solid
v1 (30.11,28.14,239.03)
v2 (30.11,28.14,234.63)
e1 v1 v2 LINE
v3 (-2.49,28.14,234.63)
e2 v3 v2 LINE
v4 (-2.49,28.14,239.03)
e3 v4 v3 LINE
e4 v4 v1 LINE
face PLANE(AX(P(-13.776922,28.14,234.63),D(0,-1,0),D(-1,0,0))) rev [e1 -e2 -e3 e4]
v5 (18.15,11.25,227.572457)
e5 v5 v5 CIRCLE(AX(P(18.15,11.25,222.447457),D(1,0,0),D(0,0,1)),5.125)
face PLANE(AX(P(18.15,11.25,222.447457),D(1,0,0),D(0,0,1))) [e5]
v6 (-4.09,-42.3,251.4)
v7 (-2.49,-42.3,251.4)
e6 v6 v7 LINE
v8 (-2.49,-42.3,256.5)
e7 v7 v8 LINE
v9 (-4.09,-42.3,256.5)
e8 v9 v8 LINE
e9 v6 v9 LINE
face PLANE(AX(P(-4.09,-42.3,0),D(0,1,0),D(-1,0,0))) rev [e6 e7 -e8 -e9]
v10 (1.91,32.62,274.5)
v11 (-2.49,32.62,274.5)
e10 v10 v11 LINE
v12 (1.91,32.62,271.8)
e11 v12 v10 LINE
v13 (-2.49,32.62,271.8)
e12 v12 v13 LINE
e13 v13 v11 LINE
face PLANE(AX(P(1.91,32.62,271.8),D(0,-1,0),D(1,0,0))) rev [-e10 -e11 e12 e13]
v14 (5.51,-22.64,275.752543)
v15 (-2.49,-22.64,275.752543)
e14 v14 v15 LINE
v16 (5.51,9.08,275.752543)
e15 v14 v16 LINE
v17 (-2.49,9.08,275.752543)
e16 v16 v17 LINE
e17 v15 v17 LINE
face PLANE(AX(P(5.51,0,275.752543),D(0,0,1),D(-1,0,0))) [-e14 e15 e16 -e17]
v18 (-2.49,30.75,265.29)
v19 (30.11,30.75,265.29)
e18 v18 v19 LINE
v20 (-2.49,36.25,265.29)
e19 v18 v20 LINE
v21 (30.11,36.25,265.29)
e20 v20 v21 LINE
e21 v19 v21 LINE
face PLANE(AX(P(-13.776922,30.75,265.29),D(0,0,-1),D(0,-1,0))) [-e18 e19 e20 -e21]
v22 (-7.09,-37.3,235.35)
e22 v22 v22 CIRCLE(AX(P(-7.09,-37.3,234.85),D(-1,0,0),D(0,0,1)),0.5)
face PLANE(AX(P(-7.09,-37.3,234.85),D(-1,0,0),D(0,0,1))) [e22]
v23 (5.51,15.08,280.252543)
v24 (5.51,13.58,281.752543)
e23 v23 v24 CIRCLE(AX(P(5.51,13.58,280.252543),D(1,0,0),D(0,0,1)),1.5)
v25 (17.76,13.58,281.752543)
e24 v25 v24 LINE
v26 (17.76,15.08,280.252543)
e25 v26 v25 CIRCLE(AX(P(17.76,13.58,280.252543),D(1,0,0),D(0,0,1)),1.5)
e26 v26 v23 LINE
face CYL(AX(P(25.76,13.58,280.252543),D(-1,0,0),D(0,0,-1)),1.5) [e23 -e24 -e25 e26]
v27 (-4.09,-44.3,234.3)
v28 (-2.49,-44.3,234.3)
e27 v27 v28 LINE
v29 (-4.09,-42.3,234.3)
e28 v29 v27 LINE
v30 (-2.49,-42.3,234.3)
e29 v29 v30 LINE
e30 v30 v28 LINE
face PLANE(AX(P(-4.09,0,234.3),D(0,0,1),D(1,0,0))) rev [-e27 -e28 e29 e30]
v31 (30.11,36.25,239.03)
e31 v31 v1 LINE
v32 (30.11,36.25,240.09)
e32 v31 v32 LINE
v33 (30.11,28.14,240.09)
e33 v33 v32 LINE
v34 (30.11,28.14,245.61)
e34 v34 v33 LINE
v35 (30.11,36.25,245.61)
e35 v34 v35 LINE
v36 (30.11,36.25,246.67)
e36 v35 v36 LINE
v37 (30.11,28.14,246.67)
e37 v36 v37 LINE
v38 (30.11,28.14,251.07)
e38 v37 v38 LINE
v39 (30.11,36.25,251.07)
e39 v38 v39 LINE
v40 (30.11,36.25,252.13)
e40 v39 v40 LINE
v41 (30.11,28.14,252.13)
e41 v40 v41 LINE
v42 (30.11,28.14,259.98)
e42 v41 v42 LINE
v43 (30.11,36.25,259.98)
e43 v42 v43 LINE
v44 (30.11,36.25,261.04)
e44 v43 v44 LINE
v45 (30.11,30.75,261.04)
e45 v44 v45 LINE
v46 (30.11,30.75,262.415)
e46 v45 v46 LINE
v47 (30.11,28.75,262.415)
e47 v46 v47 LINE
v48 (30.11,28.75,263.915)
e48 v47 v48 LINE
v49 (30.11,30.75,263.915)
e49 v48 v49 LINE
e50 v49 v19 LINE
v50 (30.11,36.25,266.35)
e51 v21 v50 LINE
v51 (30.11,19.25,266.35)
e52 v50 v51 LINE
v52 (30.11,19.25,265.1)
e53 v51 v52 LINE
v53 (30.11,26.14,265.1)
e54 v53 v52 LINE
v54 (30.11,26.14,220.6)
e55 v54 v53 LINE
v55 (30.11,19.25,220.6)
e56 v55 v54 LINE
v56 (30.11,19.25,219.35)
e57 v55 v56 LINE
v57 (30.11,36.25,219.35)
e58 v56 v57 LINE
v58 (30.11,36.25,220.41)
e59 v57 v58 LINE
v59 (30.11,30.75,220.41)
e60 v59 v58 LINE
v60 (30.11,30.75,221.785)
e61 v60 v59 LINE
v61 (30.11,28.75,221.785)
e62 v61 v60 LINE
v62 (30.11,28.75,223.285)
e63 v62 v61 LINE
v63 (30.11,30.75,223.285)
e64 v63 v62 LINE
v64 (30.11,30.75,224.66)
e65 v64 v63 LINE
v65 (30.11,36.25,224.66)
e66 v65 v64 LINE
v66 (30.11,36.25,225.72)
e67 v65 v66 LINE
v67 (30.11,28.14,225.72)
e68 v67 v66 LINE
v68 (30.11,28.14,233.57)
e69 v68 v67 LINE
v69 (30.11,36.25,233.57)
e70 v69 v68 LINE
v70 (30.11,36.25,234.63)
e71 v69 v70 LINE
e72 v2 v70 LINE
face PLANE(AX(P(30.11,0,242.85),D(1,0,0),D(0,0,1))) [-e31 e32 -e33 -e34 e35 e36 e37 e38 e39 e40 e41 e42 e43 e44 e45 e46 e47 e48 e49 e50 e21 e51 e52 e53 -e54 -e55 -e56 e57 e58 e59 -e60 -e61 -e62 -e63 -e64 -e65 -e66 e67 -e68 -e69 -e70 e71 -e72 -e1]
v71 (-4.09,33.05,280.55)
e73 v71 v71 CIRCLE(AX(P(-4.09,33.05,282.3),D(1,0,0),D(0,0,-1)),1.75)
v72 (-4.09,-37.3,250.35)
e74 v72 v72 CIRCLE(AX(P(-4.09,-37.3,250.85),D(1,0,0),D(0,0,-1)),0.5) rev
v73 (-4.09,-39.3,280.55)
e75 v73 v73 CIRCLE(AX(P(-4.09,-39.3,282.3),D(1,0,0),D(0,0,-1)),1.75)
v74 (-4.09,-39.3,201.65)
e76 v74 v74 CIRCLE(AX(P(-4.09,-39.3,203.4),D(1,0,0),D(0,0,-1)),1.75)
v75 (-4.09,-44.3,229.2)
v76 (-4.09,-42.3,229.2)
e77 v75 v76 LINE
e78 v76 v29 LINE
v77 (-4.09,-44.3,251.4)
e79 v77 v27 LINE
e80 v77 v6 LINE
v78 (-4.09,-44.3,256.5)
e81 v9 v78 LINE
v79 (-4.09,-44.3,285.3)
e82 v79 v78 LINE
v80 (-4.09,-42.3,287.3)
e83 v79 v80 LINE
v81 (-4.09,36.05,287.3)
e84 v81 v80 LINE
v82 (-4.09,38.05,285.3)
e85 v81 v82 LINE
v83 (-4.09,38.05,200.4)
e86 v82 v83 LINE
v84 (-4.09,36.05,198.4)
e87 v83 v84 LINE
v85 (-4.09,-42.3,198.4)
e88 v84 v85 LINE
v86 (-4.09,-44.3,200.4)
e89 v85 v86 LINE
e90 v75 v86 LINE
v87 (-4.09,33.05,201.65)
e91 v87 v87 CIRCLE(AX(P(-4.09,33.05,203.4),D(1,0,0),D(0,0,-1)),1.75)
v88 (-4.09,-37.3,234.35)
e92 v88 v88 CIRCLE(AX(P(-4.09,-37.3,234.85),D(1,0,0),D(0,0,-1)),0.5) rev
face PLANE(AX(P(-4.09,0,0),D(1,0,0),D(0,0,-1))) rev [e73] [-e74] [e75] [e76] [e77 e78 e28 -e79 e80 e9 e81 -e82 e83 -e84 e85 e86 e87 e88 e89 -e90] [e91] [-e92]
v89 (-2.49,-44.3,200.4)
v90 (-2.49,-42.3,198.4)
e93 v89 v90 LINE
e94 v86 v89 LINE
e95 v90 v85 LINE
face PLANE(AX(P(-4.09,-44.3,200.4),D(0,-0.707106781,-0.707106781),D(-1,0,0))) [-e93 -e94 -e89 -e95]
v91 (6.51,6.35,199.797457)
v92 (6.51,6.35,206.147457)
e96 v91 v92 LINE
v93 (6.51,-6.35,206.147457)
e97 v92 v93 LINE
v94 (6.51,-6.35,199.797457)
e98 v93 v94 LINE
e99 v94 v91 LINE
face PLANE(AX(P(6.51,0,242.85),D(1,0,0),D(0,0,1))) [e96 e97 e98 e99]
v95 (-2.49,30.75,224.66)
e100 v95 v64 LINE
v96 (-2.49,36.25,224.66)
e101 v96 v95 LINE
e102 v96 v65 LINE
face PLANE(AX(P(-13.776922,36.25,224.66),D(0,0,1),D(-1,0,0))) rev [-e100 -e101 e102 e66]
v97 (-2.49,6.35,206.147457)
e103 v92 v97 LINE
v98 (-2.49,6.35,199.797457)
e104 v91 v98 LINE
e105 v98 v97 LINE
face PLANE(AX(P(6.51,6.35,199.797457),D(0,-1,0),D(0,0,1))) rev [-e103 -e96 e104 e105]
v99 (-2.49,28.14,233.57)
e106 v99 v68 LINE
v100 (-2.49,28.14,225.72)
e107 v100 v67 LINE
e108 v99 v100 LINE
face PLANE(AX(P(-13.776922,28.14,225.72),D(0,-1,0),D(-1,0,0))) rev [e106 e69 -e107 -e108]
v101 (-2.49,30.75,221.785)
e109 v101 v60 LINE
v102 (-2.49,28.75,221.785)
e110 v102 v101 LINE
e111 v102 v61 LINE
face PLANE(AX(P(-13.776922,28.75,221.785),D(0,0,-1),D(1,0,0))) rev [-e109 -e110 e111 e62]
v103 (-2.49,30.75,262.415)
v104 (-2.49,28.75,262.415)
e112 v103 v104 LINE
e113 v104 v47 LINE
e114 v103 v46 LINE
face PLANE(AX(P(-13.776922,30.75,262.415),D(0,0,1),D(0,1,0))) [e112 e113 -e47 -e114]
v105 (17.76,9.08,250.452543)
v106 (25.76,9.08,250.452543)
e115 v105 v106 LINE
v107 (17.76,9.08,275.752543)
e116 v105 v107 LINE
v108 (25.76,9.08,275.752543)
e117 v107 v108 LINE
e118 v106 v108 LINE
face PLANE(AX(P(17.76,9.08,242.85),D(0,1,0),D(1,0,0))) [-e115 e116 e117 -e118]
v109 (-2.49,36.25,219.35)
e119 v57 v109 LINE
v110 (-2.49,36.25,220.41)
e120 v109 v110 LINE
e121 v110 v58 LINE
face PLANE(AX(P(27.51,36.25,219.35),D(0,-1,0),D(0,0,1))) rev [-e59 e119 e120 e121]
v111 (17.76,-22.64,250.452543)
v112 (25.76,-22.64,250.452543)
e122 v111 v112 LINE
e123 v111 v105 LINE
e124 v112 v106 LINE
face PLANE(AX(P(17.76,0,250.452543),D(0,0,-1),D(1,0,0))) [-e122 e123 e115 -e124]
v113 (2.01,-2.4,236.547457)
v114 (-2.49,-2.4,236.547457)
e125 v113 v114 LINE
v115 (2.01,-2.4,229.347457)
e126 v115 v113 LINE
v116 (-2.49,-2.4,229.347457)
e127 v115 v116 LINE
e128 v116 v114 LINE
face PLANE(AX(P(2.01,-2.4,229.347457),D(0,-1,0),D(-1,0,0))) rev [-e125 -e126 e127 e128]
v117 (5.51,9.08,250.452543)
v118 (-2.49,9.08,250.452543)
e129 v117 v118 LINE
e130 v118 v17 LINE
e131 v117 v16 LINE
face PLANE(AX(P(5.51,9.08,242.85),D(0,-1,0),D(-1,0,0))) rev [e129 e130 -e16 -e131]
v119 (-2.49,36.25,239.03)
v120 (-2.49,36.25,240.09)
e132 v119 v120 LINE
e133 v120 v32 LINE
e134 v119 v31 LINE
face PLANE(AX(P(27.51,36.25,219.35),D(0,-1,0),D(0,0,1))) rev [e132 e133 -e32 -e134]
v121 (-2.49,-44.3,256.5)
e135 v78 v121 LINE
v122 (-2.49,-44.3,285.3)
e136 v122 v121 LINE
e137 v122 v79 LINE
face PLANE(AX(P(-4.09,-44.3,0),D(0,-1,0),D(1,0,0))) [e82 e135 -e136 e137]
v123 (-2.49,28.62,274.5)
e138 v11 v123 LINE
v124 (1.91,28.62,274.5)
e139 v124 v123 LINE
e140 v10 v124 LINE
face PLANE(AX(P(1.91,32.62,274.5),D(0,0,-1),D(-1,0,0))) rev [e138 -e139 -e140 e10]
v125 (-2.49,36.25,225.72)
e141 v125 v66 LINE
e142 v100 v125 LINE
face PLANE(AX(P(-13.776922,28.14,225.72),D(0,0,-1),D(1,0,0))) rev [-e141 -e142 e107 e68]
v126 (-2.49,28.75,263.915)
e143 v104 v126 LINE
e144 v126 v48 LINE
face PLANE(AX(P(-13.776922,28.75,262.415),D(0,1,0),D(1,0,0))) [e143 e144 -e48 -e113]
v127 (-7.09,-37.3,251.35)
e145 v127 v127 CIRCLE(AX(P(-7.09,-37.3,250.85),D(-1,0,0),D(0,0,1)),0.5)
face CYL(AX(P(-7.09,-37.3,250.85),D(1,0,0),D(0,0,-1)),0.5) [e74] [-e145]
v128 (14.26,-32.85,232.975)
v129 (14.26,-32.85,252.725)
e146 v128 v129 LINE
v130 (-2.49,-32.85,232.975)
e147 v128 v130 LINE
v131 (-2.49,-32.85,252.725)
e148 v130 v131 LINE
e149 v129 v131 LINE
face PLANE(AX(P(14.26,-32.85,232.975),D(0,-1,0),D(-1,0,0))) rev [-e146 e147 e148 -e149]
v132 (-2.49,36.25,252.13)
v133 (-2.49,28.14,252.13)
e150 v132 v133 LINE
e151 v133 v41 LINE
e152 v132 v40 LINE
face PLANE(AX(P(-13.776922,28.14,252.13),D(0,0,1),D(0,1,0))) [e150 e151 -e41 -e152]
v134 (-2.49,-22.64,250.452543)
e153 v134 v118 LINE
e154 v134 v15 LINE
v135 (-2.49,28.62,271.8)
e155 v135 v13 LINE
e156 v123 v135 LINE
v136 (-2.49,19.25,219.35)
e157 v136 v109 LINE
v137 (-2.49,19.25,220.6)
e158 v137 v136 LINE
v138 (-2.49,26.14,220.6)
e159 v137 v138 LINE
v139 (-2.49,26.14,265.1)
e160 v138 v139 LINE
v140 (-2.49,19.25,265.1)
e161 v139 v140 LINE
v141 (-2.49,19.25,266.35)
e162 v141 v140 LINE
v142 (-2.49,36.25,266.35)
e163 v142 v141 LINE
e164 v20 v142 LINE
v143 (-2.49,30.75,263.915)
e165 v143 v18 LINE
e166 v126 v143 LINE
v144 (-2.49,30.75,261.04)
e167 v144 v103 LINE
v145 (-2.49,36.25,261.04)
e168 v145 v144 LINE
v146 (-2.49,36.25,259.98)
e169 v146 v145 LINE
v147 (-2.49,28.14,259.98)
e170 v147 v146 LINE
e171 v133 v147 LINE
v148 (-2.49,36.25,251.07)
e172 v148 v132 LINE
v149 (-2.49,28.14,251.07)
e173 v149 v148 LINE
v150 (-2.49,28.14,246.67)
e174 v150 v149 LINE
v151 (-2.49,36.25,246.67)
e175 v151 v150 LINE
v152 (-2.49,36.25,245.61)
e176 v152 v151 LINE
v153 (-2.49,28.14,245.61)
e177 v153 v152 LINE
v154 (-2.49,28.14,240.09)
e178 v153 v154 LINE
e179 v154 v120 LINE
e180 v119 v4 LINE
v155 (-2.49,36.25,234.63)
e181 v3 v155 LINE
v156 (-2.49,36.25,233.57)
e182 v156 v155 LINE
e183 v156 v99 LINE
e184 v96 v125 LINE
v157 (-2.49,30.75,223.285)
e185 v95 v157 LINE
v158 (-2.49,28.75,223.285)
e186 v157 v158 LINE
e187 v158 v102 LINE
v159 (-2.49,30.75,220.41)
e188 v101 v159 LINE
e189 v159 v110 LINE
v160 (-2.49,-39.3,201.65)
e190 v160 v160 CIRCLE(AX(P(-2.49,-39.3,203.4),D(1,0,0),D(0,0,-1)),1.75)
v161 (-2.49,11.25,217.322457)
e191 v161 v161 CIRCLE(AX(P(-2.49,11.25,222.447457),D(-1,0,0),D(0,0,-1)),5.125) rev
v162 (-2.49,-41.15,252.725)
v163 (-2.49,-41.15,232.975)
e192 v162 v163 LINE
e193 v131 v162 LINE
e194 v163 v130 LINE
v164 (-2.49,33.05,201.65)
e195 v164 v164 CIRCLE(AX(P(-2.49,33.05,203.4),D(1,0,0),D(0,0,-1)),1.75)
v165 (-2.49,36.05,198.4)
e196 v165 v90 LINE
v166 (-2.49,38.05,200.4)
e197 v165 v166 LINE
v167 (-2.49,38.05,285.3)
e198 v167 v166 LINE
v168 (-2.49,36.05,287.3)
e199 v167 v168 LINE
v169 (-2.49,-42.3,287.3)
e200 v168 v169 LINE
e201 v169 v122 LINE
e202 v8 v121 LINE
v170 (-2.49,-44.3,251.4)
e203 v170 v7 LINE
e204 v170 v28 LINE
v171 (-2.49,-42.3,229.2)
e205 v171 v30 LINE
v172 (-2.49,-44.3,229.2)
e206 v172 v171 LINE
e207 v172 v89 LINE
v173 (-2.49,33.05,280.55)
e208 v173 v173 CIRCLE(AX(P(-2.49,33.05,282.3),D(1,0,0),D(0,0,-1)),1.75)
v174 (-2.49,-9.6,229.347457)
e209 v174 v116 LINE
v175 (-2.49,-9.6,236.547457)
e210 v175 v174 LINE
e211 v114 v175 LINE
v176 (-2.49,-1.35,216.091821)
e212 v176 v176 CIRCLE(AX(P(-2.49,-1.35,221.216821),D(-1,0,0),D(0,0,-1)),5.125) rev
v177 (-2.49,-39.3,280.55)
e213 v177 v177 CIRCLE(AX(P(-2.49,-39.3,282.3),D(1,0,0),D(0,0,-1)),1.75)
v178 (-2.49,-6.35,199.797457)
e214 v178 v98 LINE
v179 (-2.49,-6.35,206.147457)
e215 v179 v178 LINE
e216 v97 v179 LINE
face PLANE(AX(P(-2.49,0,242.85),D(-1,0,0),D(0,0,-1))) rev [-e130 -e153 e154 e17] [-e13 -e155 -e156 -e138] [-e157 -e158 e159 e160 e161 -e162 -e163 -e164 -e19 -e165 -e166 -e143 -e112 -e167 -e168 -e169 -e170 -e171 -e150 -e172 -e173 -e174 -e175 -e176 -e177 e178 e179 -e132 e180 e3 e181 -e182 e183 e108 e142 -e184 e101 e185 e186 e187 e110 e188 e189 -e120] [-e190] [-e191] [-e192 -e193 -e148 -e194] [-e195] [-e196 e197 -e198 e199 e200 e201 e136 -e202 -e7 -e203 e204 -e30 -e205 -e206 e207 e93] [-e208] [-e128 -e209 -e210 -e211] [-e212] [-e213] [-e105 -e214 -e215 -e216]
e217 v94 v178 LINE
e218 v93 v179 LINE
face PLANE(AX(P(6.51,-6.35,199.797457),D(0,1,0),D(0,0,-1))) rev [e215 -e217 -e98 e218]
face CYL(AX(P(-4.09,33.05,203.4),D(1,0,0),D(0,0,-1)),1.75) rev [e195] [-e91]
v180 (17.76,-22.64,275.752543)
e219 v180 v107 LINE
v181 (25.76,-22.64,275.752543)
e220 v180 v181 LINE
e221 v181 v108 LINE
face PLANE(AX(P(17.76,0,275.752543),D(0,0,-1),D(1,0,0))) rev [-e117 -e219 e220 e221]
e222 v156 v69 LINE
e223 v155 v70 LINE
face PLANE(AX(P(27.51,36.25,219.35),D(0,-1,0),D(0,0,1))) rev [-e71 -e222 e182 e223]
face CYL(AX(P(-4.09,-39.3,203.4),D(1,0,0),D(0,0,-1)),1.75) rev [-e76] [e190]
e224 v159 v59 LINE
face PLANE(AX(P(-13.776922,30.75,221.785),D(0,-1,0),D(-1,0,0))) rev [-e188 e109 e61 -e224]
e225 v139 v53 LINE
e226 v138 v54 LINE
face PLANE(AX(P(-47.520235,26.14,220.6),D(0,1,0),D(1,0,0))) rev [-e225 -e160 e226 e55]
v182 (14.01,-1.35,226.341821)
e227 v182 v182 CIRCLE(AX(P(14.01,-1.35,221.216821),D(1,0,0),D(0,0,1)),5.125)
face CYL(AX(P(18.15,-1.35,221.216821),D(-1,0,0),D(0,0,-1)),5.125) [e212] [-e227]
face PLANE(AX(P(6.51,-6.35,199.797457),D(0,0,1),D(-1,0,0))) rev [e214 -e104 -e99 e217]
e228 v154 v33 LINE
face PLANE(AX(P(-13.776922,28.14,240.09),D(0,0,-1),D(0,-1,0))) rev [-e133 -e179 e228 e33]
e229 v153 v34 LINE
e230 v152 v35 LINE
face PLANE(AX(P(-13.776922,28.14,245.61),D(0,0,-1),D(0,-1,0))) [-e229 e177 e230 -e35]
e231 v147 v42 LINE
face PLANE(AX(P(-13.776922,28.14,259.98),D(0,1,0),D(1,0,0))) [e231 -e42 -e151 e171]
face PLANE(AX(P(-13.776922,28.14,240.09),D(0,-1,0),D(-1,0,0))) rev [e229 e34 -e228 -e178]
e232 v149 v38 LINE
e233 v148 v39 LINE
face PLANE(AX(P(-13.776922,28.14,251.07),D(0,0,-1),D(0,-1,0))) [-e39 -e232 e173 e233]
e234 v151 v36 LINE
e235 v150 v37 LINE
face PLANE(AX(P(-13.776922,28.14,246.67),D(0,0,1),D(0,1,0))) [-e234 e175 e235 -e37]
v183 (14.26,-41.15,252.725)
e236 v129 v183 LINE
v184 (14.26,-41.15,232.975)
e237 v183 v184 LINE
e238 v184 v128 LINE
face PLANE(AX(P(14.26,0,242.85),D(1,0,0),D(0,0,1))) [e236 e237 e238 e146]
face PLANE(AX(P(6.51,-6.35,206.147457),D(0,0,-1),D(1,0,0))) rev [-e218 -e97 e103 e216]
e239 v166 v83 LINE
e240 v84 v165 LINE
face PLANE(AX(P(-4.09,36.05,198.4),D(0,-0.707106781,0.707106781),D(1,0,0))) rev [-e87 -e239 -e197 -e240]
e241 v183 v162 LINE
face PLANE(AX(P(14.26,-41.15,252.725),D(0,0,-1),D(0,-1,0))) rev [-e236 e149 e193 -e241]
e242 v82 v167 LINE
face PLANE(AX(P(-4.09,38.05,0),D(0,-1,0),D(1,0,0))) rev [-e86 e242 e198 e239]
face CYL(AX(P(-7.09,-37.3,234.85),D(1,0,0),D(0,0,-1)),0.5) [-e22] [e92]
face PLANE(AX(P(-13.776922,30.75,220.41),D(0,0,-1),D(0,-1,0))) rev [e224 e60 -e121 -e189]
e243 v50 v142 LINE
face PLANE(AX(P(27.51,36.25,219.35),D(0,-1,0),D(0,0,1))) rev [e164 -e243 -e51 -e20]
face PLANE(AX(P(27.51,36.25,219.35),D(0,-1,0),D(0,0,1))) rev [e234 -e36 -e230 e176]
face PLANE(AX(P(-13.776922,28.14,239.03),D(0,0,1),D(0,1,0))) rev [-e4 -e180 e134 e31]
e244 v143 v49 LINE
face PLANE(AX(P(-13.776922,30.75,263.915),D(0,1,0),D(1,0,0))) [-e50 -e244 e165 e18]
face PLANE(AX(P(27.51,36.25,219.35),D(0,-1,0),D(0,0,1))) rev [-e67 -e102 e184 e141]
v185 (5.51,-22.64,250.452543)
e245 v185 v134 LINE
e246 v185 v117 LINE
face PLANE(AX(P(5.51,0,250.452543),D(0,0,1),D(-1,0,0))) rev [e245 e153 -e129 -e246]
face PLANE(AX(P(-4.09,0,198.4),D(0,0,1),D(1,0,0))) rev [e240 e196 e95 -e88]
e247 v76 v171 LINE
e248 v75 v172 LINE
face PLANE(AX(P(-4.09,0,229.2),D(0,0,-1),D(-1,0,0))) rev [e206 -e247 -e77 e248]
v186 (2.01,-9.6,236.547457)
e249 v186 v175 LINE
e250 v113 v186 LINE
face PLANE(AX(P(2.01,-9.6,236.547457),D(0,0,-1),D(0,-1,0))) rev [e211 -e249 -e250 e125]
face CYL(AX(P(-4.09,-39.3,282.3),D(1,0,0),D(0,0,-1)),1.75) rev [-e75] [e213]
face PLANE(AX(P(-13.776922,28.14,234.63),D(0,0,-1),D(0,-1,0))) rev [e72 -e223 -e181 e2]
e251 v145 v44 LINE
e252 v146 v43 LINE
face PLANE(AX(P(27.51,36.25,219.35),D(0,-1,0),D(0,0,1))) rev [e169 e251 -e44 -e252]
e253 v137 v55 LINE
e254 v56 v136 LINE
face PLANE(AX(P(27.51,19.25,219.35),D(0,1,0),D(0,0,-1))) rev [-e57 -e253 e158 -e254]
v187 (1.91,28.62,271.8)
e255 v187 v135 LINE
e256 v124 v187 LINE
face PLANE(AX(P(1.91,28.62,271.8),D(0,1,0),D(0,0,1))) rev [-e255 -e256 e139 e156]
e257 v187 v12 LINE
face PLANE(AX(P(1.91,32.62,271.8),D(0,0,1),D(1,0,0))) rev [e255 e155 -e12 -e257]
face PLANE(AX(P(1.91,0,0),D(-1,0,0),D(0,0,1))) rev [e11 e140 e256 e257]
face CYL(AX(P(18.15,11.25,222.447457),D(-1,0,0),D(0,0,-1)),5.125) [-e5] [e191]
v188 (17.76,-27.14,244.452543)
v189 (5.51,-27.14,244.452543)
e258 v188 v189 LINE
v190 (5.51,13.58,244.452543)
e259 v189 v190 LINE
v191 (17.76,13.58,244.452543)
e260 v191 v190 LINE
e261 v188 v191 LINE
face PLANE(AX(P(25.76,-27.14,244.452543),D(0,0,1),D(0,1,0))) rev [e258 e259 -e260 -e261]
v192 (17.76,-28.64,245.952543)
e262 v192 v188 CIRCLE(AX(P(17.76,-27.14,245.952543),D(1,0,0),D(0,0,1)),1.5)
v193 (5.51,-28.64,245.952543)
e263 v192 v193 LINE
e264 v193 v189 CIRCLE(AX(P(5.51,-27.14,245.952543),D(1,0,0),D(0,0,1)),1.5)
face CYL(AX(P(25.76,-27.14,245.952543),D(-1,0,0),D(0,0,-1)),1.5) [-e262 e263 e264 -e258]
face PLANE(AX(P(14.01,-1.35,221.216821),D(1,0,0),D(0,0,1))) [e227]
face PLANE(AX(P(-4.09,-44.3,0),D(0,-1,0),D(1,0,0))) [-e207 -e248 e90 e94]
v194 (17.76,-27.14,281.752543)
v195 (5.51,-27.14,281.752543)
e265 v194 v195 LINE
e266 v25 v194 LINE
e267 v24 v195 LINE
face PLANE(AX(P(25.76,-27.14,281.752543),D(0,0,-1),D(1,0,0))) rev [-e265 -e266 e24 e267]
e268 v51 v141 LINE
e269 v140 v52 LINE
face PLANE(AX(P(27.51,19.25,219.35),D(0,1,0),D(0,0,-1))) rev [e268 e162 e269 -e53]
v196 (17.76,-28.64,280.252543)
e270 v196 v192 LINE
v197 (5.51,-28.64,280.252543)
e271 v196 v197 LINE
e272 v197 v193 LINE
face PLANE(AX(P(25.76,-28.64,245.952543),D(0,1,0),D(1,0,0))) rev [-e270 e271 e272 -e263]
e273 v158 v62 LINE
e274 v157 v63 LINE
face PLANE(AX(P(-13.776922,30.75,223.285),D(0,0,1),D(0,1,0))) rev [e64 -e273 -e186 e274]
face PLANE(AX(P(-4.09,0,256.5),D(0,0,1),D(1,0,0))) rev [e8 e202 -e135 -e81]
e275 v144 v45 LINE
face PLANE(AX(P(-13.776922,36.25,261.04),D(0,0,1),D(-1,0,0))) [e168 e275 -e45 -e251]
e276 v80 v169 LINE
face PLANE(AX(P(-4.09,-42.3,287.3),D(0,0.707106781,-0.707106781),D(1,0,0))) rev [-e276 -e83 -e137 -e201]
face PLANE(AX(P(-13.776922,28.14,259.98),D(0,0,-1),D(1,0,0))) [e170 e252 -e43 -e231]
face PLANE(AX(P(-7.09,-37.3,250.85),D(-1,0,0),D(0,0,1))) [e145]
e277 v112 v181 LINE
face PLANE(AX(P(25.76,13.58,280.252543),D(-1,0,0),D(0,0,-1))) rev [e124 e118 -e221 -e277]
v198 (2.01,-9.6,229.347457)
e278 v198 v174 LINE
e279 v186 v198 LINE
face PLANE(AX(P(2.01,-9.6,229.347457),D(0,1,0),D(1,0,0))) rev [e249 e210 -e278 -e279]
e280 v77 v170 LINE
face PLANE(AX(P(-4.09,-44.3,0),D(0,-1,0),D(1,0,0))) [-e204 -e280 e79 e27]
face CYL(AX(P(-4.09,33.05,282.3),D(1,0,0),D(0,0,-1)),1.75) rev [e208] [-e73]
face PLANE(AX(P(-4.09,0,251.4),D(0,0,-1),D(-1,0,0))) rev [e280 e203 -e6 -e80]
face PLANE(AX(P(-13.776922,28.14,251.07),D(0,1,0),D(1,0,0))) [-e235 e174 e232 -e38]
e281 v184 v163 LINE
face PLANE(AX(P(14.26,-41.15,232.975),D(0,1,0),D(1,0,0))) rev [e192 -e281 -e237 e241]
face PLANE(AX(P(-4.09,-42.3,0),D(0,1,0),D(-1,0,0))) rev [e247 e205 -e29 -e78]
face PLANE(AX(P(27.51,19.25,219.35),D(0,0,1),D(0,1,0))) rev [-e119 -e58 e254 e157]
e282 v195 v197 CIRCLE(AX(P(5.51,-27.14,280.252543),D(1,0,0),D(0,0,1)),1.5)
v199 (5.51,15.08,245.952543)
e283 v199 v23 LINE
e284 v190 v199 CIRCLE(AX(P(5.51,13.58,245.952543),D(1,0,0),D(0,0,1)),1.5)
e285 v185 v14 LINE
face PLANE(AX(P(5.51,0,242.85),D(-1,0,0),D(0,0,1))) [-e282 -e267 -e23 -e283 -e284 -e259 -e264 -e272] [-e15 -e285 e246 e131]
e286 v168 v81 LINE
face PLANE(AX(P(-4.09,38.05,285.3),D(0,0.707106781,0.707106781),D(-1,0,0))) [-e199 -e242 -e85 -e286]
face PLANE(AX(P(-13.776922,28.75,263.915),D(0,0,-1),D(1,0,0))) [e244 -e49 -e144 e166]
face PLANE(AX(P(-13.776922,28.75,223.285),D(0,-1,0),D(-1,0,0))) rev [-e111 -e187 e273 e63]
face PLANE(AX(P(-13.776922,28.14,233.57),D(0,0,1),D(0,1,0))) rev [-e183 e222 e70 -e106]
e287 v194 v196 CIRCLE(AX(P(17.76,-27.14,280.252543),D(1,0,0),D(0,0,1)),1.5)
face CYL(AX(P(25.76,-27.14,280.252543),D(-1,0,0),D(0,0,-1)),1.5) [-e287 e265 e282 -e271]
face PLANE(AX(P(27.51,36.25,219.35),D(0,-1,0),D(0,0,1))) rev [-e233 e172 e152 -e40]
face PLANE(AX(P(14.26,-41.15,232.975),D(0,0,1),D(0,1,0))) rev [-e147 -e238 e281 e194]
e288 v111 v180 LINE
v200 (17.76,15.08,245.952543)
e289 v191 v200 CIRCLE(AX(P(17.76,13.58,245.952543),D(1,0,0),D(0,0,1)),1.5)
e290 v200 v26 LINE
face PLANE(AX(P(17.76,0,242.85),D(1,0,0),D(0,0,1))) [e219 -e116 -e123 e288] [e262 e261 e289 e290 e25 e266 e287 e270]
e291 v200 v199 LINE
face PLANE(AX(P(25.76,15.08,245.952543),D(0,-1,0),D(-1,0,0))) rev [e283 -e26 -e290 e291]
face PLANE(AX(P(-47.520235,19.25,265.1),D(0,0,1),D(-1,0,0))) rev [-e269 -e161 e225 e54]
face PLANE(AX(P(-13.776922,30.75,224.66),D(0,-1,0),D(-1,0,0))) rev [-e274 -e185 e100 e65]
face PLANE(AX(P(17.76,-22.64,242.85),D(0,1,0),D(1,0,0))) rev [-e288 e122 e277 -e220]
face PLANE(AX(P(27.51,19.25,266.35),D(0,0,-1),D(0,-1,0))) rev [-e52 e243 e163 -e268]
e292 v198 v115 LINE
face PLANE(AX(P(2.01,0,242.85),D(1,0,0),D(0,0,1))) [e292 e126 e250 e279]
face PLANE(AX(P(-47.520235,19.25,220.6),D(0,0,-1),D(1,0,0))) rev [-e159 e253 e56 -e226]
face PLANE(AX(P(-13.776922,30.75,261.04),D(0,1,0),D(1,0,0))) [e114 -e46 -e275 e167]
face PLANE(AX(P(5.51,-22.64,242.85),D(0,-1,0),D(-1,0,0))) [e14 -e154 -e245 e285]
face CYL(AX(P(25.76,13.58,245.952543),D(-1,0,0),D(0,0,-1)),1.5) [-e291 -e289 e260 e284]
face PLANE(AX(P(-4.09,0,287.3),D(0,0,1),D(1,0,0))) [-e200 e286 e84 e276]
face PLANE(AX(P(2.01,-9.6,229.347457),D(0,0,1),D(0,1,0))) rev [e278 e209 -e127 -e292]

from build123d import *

# Parameters (mm, degrees)
BOSS_EXTRUDE1_START        = -1.6
BOSS_EXTRUDE1_OUTLINE_W    = 25.3
BOSS_EXTRUDE1_OUTLINE_H    = 31.72
BOSS_EXTRUDE1_DEPTH        = 29.85
BOSS_EXTRUDE1_START_2      = 8
BOSS_EXTRUDE1_2_OUTLINE_W  = 25.3
BOSS_EXTRUDE1_2_OUTLINE_H  = 31.72
BOSS_EXTRUDE1_2_OUTLINE_R  = 5.125
BOSS_EXTRUDE1_2_DEPTH      = 12.25
BOSS_EXTRUDE1_3_OUTLINE_R  = 1.75
BOSS_EXTRUDE1_3_OUTLINE_W  = 25.3
BOSS_EXTRUDE1_3_OUTLINE_H  = 31.72
BOSS_EXTRUDE1_3_DEPTH      = 1.6
BOSS_EXTRUDE1_4_OUTLINE_R  = 5.125
BOSS_EXTRUDE1_4_OUTLINE_W  = 19.75
BOSS_EXTRUDE1_4_OUTLINE_H  = 8.3
BOSS_EXTRUDE1_4_DEPTH      = 16.14
BOSS_EXTRUDE1_5_OUTLINE_W  = 6.35
BOSS_EXTRUDE1_5_OUTLINE_H  = 12.7
BOSS_EXTRUDE1_5_DEPTH      = 9
BOSS_EXTRUDE1_START_3      = 28.25
BOSS_EXTRUDE1_6_DEPTH      = 1.75
BOSS_EXTRUDE1_7_OUTLINE_W  = 7.2
BOSS_EXTRUDE1_7_OUTLINE_H  = 7.2
BOSS_EXTRUDE1_7_DEPTH      = 4.5
BOSS_EXTRUDE1_START_4      = 16.14
BOSS_EXTRUDE1_8_OUTLINE_W  = 19.75
BOSS_EXTRUDE1_8_OUTLINE_H  = 8.3
BOSS_EXTRUDE1_8_DEPTH      = 0.61
BOSS_EXTRUDE1_START_5      = -1.5
BOSS_EXTRUDE1_9_OUTLINE_W  = 5.1
BOSS_EXTRUDE1_9_OUTLINE_H  = 1.7
BOSS_EXTRUDE1_9_DEPTH      = 1.5
BOSS_EXTRUDE1_START_6      = 20.25
BOSS_EXTRUDE1_10_OUTLINE_R = 5.125
BOSS_EXTRUDE1_10_DEPTH     = 0.39
CUT_EXTRUDE1_START         = -1.5
SKETCH1_3_W                = 125.683572393
SKETCH1_3_H                = 110.20529993
SKETCH1_3_W_2              = 88.9
SKETCH1_3_H_2              = 82.35
SKETCH1_3_R                = 1.75
SKETCH1_3_W_3              = 5.1
SKETCH1_3_H_3              = 2
CUT_EXTRUDE1_DEPTH         = 1.5
CHAMFER1_SIZE              = 2
SKETCH2_W                  = 2.7
SKETCH2_H                  = 4
BOSS_EXTRUDE2_DEPTH        = 4.4
SKETCH3_R                  = 0.5
BOSS_EXTRUDE3_DEPTH        = 3
MOVE_FACE1_BY              = 2.6
MOVE_FACE2_BY              = 0.36


with BuildPart() as part:
    # Boss-Extrude1: read off the stored shape, not the designer's step
    # Boss-Extrude1 outline → Boss-Extrude1 (new body)
    with BuildSketch(Plane(origin=(-2.49, 0, 0), x_dir=(0, 0, -1), z_dir=(1, 0, 0)).offset(BOSS_EXTRUDE1_START)):
        with Locations((-263.102543264, -6.78)):
            Rectangle(BOSS_EXTRUDE1_OUTLINE_W, BOSS_EXTRUDE1_OUTLINE_H)
        Polygon((-240.09, 28.14), (-245.61, 28.14), (-245.61, 36.25), (-246.67, 36.25), (-246.67, 28.14), (-251.07, 28.14), (-251.07, 36.25), (-252.13, 36.25), (-252.13, 28.14), (-259.98, 28.14), (-259.98, 36.25), (-261.04, 36.25), (-261.04, 30.75), (-262.415, 30.75), (-262.415, 28.75), (-263.915, 28.75), (-263.915, 30.75), (-265.29, 30.75), (-265.29, 36.25), (-266.35, 36.25), (-266.35, 19.25), (-265.1, 19.25), (-265.1, 26.14), (-220.6, 26.14), (-220.6, 19.25), (-219.35, 19.25), (-219.35, 36.25), (-220.41, 36.25), (-220.41, 30.75), (-221.785, 30.75), (-221.785, 28.75), (-223.285, 28.75), (-223.285, 30.75), (-224.66, 30.75), (-224.66, 36.25), (-225.72, 36.25), (-225.72, 28.14), (-233.57, 28.14), (-233.57, 36.25), (-234.63, 36.25), (-234.63, 28.14), (-239.03, 28.14), (-239.03, 36.25), (-240.09, 36.25), align=None)
    extrude(amount=BOSS_EXTRUDE1_DEPTH)

    # Boss-Extrude1 2 outline → Boss-Extrude1 2 (add)
    # profile 1 of 2: a face of its own
    with BuildSketch(Plane(origin=(-2.49, 0, 0), x_dir=(0, 0, -1), z_dir=(1, 0, 0)).offset(BOSS_EXTRUDE1_START_2)):
        with BuildLine():
            ThreePointArc((-280.252543264, 15.08), (-281.313203436, 14.640660172), (-281.752543264, 13.58))
            Line((-281.752543264, 13.58), (-281.752543264, -27.14))
            ThreePointArc((-281.752543264, -27.14), (-281.313203436, -28.200660172), (-280.252543264, -28.64))
            Line((-280.252543264, -28.64), (-245.952543264, -28.64))
            ThreePointArc((-245.952543264, -28.64), (-244.891883092, -28.200660172), (-244.452543264, -27.14))
            Line((-244.452543264, -27.14), (-244.452543264, 13.58))
            ThreePointArc((-244.452543264, 13.58), (-244.891883092, 14.640660172), (-245.952543264, 15.08))
            Line((-245.952543264, 15.08), (-280.252543264, 15.08))
        make_face()
        with Locations((-263.102543264, -6.78)):
            Rectangle(BOSS_EXTRUDE1_2_OUTLINE_W, BOSS_EXTRUDE1_2_OUTLINE_H, mode=Mode.SUBTRACT)
    # profile 2 of 2: a face of its own
    with BuildSketch(Plane(origin=(-2.49, 0, 0), x_dir=(0, 0, -1), z_dir=(1, 0, 0)).offset(BOSS_EXTRUDE1_START_2)):
        with Locations((-222.447456736, 11.25)):
            Circle(BOSS_EXTRUDE1_2_OUTLINE_R)
    extrude(amount=BOSS_EXTRUDE1_2_DEPTH)

    # Boss-Extrude1 3 outline → Boss-Extrude1 3 (add)
    with BuildSketch(Plane(origin=(-2.49, 0, 0), x_dir=(0, 0, -1), z_dir=(1, 0, 0)).offset(BOSS_EXTRUDE1_START)):
        Polygon((-251.4, -42.3), (-251.4, -44.3), (-234.3, -44.3), (-234.3, -42.3), (-229.2, -42.3), (-229.2, -44.3), (-198.4, -44.3), (-198.4, 38.05), (-287.3, 38.05), (-287.3, -44.3), (-256.5, -44.3), (-256.5, -42.3), align=None)
        with Locations((-282.3, -39.3)):
            Circle(BOSS_EXTRUDE1_3_OUTLINE_R, mode=Mode.SUBTRACT)
        with Locations((-203.4, -39.3)):
            Circle(BOSS_EXTRUDE1_3_OUTLINE_R, mode=Mode.SUBTRACT)
        with Locations((-282.3, 33.05)):
            Circle(BOSS_EXTRUDE1_3_OUTLINE_R, mode=Mode.SUBTRACT)
        Polygon((-245.61, 36.25), (-245.61, 28.14), (-240.09, 28.14), (-240.09, 36.25), (-239.03, 36.25), (-239.03, 28.14), (-234.63, 28.14), (-234.63, 36.25), (-233.57, 36.25), (-233.57, 28.14), (-225.72, 28.14), (-225.72, 36.25), (-224.66, 36.25), (-224.66, 30.75), (-223.285, 30.75), (-223.285, 28.75), (-221.785, 28.75), (-221.785, 30.75), (-220.41, 30.75), (-220.41, 36.25), (-219.35, 36.25), (-219.35, 19.25), (-220.6, 19.25), (-220.6, 26.14), (-265.1, 26.14), (-265.1, 19.25), (-266.35, 19.25), (-266.35, 36.25), (-265.29, 36.25), (-265.29, 30.75), (-263.915, 30.75), (-263.915, 28.75), (-262.415, 28.75), (-262.415, 30.75), (-261.04, 30.75), (-261.04, 36.25), (-259.98, 36.25), (-259.98, 28.14), (-252.13, 28.14), (-252.13, 36.25), (-251.07, 36.25), (-251.07, 28.14), (-246.67, 28.14), (-246.67, 36.25), align=None, mode=Mode.SUBTRACT)
        with Locations((-203.4, 33.05)):
            Circle(BOSS_EXTRUDE1_3_OUTLINE_R, mode=Mode.SUBTRACT)
        with Locations((-263.102543264, -6.78)):
            Rectangle(BOSS_EXTRUDE1_3_OUTLINE_W, BOSS_EXTRUDE1_3_OUTLINE_H, mode=Mode.SUBTRACT)
    extrude(amount=BOSS_EXTRUDE1_3_DEPTH)

    # Boss-Extrude1 4 outline → Boss-Extrude1 4 (add)
    with BuildSketch(Plane(origin=(-2.49, 0, 0), x_dir=(0, 0, -1), z_dir=(1, 0, 0))):
        with Locations((-221.216821393, -1.35)):
            Circle(BOSS_EXTRUDE1_4_OUTLINE_R)
        with Locations((-242.85, -37)):
            Rectangle(BOSS_EXTRUDE1_4_OUTLINE_W, BOSS_EXTRUDE1_4_OUTLINE_H)
        with Locations((-222.447456736, 11.25)):
            Circle(BOSS_EXTRUDE1_4_OUTLINE_R)
    extrude(amount=BOSS_EXTRUDE1_4_DEPTH)

    # Boss-Extrude1 5 outline → Boss-Extrude1 5 (add)
    with BuildSketch(Plane(origin=(-2.49, 0, 0), x_dir=(0, 0, -1), z_dir=(1, 0, 0))):
        with Locations((-202.972456736, 0)):
            Rectangle(BOSS_EXTRUDE1_5_OUTLINE_W, BOSS_EXTRUDE1_5_OUTLINE_H)
    extrude(amount=BOSS_EXTRUDE1_5_DEPTH)

    # Boss-Extrude1 6 outline → Boss-Extrude1 6 (add)
    with BuildSketch(Plane(origin=(-2.49, 0, 0), x_dir=(0, 0, -1), z_dir=(1, 0, 0)).offset(BOSS_EXTRUDE1_START_3)):
        Polygon((-240.09, 28.14), (-245.61, 28.14), (-245.61, 36.25), (-246.67, 36.25), (-246.67, 28.14), (-251.07, 28.14), (-251.07, 36.25), (-252.13, 36.25), (-252.13, 28.14), (-259.98, 28.14), (-259.98, 36.25), (-261.04, 36.25), (-261.04, 30.75), (-262.415, 30.75), (-262.415, 28.75), (-263.915, 28.75), (-263.915, 30.75), (-265.29, 30.75), (-265.29, 36.25), (-266.35, 36.25), (-266.35, 19.25), (-265.1, 19.25), (-265.1, 26.14), (-220.6, 26.14), (-220.6, 19.25), (-219.35, 19.25), (-219.35, 36.25), (-220.41, 36.25), (-220.41, 30.75), (-221.785, 30.75), (-221.785, 28.75), (-223.285, 28.75), (-223.285, 30.75), (-224.66, 30.75), (-224.66, 36.25), (-225.72, 36.25), (-225.72, 28.14), (-233.57, 28.14), (-233.57, 36.25), (-234.63, 36.25), (-234.63, 28.14), (-239.03, 28.14), (-239.03, 36.25), (-240.09, 36.25), align=None)
    extrude(amount=BOSS_EXTRUDE1_6_DEPTH)

    # Boss-Extrude1 7 outline → Boss-Extrude1 7 (add)
    with BuildSketch(Plane(origin=(-2.49, 0, 0), x_dir=(0, 0, -1), z_dir=(1, 0, 0))):
        with Locations((-232.947456736, -6)):
            Rectangle(BOSS_EXTRUDE1_7_OUTLINE_W, BOSS_EXTRUDE1_7_OUTLINE_H)
    extrude(amount=BOSS_EXTRUDE1_7_DEPTH)

    # Boss-Extrude1 8 outline → Boss-Extrude1 8 (add)
    with BuildSketch(Plane(origin=(-2.49, 0, 0), x_dir=(0, 0, -1), z_dir=(1, 0, 0)).offset(BOSS_EXTRUDE1_START_4)):
        with Locations((-242.85, -37)):
            Rectangle(BOSS_EXTRUDE1_8_OUTLINE_W, BOSS_EXTRUDE1_8_OUTLINE_H)
    extrude(amount=BOSS_EXTRUDE1_8_DEPTH)

    # Boss-Extrude1 9 outline → Boss-Extrude1 9 (add)
    with BuildSketch(Plane(origin=(-2.49, 0, 0), x_dir=(0, 0, -1), z_dir=(1, 0, 0)).offset(BOSS_EXTRUDE1_START_5)):
        with Locations((-253.95, -43.15)):
            Rectangle(BOSS_EXTRUDE1_9_OUTLINE_W, BOSS_EXTRUDE1_9_OUTLINE_H)
        with Locations((-231.75, -43.15)):
            Rectangle(BOSS_EXTRUDE1_9_OUTLINE_W, BOSS_EXTRUDE1_9_OUTLINE_H)
        Polygon((-287.752543264, -23.847456736), (-287.3, -24.3), (-287.3, 24.580582618), (-287.752543264, 24.580582618), align=None)
        Polygon((-198.4, 26.105086528), (-198.4, -24.3), (-197.947456736, -23.847456736), (-197.947456736, 25.652543264), align=None)
        with BuildLine():
            Line((-281.502543264, 33.330582618), (-281.502543264, 31.492257161))
            ThreePointArc((-281.502543264, 31.492257161), (-280.609414894, 32.597869487), (-280.831414071, 34.00171181))
            Line((-280.831414071, 34.00171181), (-281.502543264, 33.330582618))
        make_face()
        with BuildLine():
            Line((-203.60722612, 31.312312647), (-205.137687353, 32.84277388))
            ThreePointArc((-205.137687353, 32.84277388), (-204.637436867, 31.812563133), (-203.60722612, 31.312312647))
        make_face()
    extrude(amount=BOSS_EXTRUDE1_9_DEPTH)

    # Boss-Extrude1 10 outline → Boss-Extrude1 10 (add)
    with BuildSketch(Plane(origin=(-2.49, 0, 0), x_dir=(0, 0, -1), z_dir=(1, 0, 0)).offset(BOSS_EXTRUDE1_START_6)):
        with Locations((-222.447456736, 11.25)):
            Circle(BOSS_EXTRUDE1_10_OUTLINE_R)
    extrude(amount=BOSS_EXTRUDE1_10_DEPTH)

    # Sketch1<3> → Cut-Extrude1 (cut)
    # profile 1 of 7: a face of its own
    with BuildSketch(Plane(origin=(-2.49, 0, 0), x_dir=(0, 0, -1), z_dir=(1, 0, 0)).offset(CUT_EXTRUDE1_START)):
        with Locations((-237.633848224, 0.203353058)):
            Rectangle(SKETCH1_3_W, SKETCH1_3_H)
        with Locations((-242.85, -3.125)):
            Rectangle(SKETCH1_3_W_2, SKETCH1_3_H_2, mode=Mode.SUBTRACT)
    # profile 2 of 7: a face of its own
    with BuildSketch(Plane(origin=(-2.49, 0, 0), x_dir=(0, 0, -1), z_dir=(1, 0, 0)).offset(CUT_EXTRUDE1_START)):
        with Locations((-282.3, 33.05)):
            Circle(SKETCH1_3_R)
    # profile 3 of 7: a face of its own
    with BuildSketch(Plane(origin=(-2.49, 0, 0), x_dir=(0, 0, -1), z_dir=(1, 0, 0)).offset(CUT_EXTRUDE1_START)):
        with Locations((-203.4, 33.05)):
            Circle(SKETCH1_3_R)
    # profile 4 of 7: a face of its own
    with BuildSketch(Plane(origin=(-2.49, 0, 0), x_dir=(0, 0, -1), z_dir=(1, 0, 0)).offset(CUT_EXTRUDE1_START)):
        with Locations((-203.4, -39.3)):
            Circle(SKETCH1_3_R)
    # profile 5 of 7: a face of its own
    with BuildSketch(Plane(origin=(-2.49, 0, 0), x_dir=(0, 0, -1), z_dir=(1, 0, 0)).offset(CUT_EXTRUDE1_START)):
        with Locations((-282.3, -39.3)):
            Circle(SKETCH1_3_R)
    # profile 6 of 7: a face of its own
    with BuildSketch(Plane(origin=(-2.49, 0, 0), x_dir=(0, 0, -1), z_dir=(1, 0, 0)).offset(CUT_EXTRUDE1_START)):
        with Locations((-253.95, -43.3)):
            Rectangle(SKETCH1_3_W_3, SKETCH1_3_H_3)
    # profile 7 of 7: a face of its own
    with BuildSketch(Plane(origin=(-2.49, 0, 0), x_dir=(0, 0, -1), z_dir=(1, 0, 0)).offset(CUT_EXTRUDE1_START)):
        with Locations((-231.75, -43.3)):
            Rectangle(SKETCH1_3_W_3, SKETCH1_3_H_3)
    extrude(amount=CUT_EXTRUDE1_DEPTH, mode=Mode.SUBTRACT)

    # Chamfer1
    chamfer1_edges = [part.edges().sort_by_distance(p)[0] for p in [
        (-3.29, -44.3, 287.3),
        (-3.29, 38.05, 198.4),
        (-3.29, 38.05, 287.3),
        (-3.29, -44.3, 198.4),
    ]]
    chamfer(chamfer1_edges, length=CHAMFER1_SIZE)

    # Sketch2 → Boss-Extrude2 (add)
    with BuildSketch(Plane(origin=(-2.49, 0, 0), x_dir=(0, 0, -1), z_dir=(1, 0, 0))):
        with Locations((-273.15, 30.62)):
            Rectangle(SKETCH2_W, SKETCH2_H)
    extrude(amount=BOSS_EXTRUDE2_DEPTH)

    # Sketch3 → Boss-Extrude3 (add)
    with BuildSketch(Plane.ZY.offset(4.09)):
        with Locations(Location((234.85, -37.3, 0), (0, 0, 180))):
            Circle(SKETCH3_R)
        with Locations(Location((250.85, -37.3, 0), (0, 0, 180))):
            Circle(SKETCH3_R)
    extrude(amount=BOSS_EXTRUDE3_DEPTH)

    # Move Face1: a face moved outward by 2.6
    extrude(part.faces().sort_by_distance((27.51, 27.75, 242.85))[0], amount=MOVE_FACE1_BY, dir=(1, 0, 0))

    # Move Face2: a face moved outward by 0.36
    extrude(part.faces().sort_by_distance((13.65, -1.35, 221.216821393))[0], amount=MOVE_FACE2_BY, dir=(1, 0, 0))


solid = part.part
